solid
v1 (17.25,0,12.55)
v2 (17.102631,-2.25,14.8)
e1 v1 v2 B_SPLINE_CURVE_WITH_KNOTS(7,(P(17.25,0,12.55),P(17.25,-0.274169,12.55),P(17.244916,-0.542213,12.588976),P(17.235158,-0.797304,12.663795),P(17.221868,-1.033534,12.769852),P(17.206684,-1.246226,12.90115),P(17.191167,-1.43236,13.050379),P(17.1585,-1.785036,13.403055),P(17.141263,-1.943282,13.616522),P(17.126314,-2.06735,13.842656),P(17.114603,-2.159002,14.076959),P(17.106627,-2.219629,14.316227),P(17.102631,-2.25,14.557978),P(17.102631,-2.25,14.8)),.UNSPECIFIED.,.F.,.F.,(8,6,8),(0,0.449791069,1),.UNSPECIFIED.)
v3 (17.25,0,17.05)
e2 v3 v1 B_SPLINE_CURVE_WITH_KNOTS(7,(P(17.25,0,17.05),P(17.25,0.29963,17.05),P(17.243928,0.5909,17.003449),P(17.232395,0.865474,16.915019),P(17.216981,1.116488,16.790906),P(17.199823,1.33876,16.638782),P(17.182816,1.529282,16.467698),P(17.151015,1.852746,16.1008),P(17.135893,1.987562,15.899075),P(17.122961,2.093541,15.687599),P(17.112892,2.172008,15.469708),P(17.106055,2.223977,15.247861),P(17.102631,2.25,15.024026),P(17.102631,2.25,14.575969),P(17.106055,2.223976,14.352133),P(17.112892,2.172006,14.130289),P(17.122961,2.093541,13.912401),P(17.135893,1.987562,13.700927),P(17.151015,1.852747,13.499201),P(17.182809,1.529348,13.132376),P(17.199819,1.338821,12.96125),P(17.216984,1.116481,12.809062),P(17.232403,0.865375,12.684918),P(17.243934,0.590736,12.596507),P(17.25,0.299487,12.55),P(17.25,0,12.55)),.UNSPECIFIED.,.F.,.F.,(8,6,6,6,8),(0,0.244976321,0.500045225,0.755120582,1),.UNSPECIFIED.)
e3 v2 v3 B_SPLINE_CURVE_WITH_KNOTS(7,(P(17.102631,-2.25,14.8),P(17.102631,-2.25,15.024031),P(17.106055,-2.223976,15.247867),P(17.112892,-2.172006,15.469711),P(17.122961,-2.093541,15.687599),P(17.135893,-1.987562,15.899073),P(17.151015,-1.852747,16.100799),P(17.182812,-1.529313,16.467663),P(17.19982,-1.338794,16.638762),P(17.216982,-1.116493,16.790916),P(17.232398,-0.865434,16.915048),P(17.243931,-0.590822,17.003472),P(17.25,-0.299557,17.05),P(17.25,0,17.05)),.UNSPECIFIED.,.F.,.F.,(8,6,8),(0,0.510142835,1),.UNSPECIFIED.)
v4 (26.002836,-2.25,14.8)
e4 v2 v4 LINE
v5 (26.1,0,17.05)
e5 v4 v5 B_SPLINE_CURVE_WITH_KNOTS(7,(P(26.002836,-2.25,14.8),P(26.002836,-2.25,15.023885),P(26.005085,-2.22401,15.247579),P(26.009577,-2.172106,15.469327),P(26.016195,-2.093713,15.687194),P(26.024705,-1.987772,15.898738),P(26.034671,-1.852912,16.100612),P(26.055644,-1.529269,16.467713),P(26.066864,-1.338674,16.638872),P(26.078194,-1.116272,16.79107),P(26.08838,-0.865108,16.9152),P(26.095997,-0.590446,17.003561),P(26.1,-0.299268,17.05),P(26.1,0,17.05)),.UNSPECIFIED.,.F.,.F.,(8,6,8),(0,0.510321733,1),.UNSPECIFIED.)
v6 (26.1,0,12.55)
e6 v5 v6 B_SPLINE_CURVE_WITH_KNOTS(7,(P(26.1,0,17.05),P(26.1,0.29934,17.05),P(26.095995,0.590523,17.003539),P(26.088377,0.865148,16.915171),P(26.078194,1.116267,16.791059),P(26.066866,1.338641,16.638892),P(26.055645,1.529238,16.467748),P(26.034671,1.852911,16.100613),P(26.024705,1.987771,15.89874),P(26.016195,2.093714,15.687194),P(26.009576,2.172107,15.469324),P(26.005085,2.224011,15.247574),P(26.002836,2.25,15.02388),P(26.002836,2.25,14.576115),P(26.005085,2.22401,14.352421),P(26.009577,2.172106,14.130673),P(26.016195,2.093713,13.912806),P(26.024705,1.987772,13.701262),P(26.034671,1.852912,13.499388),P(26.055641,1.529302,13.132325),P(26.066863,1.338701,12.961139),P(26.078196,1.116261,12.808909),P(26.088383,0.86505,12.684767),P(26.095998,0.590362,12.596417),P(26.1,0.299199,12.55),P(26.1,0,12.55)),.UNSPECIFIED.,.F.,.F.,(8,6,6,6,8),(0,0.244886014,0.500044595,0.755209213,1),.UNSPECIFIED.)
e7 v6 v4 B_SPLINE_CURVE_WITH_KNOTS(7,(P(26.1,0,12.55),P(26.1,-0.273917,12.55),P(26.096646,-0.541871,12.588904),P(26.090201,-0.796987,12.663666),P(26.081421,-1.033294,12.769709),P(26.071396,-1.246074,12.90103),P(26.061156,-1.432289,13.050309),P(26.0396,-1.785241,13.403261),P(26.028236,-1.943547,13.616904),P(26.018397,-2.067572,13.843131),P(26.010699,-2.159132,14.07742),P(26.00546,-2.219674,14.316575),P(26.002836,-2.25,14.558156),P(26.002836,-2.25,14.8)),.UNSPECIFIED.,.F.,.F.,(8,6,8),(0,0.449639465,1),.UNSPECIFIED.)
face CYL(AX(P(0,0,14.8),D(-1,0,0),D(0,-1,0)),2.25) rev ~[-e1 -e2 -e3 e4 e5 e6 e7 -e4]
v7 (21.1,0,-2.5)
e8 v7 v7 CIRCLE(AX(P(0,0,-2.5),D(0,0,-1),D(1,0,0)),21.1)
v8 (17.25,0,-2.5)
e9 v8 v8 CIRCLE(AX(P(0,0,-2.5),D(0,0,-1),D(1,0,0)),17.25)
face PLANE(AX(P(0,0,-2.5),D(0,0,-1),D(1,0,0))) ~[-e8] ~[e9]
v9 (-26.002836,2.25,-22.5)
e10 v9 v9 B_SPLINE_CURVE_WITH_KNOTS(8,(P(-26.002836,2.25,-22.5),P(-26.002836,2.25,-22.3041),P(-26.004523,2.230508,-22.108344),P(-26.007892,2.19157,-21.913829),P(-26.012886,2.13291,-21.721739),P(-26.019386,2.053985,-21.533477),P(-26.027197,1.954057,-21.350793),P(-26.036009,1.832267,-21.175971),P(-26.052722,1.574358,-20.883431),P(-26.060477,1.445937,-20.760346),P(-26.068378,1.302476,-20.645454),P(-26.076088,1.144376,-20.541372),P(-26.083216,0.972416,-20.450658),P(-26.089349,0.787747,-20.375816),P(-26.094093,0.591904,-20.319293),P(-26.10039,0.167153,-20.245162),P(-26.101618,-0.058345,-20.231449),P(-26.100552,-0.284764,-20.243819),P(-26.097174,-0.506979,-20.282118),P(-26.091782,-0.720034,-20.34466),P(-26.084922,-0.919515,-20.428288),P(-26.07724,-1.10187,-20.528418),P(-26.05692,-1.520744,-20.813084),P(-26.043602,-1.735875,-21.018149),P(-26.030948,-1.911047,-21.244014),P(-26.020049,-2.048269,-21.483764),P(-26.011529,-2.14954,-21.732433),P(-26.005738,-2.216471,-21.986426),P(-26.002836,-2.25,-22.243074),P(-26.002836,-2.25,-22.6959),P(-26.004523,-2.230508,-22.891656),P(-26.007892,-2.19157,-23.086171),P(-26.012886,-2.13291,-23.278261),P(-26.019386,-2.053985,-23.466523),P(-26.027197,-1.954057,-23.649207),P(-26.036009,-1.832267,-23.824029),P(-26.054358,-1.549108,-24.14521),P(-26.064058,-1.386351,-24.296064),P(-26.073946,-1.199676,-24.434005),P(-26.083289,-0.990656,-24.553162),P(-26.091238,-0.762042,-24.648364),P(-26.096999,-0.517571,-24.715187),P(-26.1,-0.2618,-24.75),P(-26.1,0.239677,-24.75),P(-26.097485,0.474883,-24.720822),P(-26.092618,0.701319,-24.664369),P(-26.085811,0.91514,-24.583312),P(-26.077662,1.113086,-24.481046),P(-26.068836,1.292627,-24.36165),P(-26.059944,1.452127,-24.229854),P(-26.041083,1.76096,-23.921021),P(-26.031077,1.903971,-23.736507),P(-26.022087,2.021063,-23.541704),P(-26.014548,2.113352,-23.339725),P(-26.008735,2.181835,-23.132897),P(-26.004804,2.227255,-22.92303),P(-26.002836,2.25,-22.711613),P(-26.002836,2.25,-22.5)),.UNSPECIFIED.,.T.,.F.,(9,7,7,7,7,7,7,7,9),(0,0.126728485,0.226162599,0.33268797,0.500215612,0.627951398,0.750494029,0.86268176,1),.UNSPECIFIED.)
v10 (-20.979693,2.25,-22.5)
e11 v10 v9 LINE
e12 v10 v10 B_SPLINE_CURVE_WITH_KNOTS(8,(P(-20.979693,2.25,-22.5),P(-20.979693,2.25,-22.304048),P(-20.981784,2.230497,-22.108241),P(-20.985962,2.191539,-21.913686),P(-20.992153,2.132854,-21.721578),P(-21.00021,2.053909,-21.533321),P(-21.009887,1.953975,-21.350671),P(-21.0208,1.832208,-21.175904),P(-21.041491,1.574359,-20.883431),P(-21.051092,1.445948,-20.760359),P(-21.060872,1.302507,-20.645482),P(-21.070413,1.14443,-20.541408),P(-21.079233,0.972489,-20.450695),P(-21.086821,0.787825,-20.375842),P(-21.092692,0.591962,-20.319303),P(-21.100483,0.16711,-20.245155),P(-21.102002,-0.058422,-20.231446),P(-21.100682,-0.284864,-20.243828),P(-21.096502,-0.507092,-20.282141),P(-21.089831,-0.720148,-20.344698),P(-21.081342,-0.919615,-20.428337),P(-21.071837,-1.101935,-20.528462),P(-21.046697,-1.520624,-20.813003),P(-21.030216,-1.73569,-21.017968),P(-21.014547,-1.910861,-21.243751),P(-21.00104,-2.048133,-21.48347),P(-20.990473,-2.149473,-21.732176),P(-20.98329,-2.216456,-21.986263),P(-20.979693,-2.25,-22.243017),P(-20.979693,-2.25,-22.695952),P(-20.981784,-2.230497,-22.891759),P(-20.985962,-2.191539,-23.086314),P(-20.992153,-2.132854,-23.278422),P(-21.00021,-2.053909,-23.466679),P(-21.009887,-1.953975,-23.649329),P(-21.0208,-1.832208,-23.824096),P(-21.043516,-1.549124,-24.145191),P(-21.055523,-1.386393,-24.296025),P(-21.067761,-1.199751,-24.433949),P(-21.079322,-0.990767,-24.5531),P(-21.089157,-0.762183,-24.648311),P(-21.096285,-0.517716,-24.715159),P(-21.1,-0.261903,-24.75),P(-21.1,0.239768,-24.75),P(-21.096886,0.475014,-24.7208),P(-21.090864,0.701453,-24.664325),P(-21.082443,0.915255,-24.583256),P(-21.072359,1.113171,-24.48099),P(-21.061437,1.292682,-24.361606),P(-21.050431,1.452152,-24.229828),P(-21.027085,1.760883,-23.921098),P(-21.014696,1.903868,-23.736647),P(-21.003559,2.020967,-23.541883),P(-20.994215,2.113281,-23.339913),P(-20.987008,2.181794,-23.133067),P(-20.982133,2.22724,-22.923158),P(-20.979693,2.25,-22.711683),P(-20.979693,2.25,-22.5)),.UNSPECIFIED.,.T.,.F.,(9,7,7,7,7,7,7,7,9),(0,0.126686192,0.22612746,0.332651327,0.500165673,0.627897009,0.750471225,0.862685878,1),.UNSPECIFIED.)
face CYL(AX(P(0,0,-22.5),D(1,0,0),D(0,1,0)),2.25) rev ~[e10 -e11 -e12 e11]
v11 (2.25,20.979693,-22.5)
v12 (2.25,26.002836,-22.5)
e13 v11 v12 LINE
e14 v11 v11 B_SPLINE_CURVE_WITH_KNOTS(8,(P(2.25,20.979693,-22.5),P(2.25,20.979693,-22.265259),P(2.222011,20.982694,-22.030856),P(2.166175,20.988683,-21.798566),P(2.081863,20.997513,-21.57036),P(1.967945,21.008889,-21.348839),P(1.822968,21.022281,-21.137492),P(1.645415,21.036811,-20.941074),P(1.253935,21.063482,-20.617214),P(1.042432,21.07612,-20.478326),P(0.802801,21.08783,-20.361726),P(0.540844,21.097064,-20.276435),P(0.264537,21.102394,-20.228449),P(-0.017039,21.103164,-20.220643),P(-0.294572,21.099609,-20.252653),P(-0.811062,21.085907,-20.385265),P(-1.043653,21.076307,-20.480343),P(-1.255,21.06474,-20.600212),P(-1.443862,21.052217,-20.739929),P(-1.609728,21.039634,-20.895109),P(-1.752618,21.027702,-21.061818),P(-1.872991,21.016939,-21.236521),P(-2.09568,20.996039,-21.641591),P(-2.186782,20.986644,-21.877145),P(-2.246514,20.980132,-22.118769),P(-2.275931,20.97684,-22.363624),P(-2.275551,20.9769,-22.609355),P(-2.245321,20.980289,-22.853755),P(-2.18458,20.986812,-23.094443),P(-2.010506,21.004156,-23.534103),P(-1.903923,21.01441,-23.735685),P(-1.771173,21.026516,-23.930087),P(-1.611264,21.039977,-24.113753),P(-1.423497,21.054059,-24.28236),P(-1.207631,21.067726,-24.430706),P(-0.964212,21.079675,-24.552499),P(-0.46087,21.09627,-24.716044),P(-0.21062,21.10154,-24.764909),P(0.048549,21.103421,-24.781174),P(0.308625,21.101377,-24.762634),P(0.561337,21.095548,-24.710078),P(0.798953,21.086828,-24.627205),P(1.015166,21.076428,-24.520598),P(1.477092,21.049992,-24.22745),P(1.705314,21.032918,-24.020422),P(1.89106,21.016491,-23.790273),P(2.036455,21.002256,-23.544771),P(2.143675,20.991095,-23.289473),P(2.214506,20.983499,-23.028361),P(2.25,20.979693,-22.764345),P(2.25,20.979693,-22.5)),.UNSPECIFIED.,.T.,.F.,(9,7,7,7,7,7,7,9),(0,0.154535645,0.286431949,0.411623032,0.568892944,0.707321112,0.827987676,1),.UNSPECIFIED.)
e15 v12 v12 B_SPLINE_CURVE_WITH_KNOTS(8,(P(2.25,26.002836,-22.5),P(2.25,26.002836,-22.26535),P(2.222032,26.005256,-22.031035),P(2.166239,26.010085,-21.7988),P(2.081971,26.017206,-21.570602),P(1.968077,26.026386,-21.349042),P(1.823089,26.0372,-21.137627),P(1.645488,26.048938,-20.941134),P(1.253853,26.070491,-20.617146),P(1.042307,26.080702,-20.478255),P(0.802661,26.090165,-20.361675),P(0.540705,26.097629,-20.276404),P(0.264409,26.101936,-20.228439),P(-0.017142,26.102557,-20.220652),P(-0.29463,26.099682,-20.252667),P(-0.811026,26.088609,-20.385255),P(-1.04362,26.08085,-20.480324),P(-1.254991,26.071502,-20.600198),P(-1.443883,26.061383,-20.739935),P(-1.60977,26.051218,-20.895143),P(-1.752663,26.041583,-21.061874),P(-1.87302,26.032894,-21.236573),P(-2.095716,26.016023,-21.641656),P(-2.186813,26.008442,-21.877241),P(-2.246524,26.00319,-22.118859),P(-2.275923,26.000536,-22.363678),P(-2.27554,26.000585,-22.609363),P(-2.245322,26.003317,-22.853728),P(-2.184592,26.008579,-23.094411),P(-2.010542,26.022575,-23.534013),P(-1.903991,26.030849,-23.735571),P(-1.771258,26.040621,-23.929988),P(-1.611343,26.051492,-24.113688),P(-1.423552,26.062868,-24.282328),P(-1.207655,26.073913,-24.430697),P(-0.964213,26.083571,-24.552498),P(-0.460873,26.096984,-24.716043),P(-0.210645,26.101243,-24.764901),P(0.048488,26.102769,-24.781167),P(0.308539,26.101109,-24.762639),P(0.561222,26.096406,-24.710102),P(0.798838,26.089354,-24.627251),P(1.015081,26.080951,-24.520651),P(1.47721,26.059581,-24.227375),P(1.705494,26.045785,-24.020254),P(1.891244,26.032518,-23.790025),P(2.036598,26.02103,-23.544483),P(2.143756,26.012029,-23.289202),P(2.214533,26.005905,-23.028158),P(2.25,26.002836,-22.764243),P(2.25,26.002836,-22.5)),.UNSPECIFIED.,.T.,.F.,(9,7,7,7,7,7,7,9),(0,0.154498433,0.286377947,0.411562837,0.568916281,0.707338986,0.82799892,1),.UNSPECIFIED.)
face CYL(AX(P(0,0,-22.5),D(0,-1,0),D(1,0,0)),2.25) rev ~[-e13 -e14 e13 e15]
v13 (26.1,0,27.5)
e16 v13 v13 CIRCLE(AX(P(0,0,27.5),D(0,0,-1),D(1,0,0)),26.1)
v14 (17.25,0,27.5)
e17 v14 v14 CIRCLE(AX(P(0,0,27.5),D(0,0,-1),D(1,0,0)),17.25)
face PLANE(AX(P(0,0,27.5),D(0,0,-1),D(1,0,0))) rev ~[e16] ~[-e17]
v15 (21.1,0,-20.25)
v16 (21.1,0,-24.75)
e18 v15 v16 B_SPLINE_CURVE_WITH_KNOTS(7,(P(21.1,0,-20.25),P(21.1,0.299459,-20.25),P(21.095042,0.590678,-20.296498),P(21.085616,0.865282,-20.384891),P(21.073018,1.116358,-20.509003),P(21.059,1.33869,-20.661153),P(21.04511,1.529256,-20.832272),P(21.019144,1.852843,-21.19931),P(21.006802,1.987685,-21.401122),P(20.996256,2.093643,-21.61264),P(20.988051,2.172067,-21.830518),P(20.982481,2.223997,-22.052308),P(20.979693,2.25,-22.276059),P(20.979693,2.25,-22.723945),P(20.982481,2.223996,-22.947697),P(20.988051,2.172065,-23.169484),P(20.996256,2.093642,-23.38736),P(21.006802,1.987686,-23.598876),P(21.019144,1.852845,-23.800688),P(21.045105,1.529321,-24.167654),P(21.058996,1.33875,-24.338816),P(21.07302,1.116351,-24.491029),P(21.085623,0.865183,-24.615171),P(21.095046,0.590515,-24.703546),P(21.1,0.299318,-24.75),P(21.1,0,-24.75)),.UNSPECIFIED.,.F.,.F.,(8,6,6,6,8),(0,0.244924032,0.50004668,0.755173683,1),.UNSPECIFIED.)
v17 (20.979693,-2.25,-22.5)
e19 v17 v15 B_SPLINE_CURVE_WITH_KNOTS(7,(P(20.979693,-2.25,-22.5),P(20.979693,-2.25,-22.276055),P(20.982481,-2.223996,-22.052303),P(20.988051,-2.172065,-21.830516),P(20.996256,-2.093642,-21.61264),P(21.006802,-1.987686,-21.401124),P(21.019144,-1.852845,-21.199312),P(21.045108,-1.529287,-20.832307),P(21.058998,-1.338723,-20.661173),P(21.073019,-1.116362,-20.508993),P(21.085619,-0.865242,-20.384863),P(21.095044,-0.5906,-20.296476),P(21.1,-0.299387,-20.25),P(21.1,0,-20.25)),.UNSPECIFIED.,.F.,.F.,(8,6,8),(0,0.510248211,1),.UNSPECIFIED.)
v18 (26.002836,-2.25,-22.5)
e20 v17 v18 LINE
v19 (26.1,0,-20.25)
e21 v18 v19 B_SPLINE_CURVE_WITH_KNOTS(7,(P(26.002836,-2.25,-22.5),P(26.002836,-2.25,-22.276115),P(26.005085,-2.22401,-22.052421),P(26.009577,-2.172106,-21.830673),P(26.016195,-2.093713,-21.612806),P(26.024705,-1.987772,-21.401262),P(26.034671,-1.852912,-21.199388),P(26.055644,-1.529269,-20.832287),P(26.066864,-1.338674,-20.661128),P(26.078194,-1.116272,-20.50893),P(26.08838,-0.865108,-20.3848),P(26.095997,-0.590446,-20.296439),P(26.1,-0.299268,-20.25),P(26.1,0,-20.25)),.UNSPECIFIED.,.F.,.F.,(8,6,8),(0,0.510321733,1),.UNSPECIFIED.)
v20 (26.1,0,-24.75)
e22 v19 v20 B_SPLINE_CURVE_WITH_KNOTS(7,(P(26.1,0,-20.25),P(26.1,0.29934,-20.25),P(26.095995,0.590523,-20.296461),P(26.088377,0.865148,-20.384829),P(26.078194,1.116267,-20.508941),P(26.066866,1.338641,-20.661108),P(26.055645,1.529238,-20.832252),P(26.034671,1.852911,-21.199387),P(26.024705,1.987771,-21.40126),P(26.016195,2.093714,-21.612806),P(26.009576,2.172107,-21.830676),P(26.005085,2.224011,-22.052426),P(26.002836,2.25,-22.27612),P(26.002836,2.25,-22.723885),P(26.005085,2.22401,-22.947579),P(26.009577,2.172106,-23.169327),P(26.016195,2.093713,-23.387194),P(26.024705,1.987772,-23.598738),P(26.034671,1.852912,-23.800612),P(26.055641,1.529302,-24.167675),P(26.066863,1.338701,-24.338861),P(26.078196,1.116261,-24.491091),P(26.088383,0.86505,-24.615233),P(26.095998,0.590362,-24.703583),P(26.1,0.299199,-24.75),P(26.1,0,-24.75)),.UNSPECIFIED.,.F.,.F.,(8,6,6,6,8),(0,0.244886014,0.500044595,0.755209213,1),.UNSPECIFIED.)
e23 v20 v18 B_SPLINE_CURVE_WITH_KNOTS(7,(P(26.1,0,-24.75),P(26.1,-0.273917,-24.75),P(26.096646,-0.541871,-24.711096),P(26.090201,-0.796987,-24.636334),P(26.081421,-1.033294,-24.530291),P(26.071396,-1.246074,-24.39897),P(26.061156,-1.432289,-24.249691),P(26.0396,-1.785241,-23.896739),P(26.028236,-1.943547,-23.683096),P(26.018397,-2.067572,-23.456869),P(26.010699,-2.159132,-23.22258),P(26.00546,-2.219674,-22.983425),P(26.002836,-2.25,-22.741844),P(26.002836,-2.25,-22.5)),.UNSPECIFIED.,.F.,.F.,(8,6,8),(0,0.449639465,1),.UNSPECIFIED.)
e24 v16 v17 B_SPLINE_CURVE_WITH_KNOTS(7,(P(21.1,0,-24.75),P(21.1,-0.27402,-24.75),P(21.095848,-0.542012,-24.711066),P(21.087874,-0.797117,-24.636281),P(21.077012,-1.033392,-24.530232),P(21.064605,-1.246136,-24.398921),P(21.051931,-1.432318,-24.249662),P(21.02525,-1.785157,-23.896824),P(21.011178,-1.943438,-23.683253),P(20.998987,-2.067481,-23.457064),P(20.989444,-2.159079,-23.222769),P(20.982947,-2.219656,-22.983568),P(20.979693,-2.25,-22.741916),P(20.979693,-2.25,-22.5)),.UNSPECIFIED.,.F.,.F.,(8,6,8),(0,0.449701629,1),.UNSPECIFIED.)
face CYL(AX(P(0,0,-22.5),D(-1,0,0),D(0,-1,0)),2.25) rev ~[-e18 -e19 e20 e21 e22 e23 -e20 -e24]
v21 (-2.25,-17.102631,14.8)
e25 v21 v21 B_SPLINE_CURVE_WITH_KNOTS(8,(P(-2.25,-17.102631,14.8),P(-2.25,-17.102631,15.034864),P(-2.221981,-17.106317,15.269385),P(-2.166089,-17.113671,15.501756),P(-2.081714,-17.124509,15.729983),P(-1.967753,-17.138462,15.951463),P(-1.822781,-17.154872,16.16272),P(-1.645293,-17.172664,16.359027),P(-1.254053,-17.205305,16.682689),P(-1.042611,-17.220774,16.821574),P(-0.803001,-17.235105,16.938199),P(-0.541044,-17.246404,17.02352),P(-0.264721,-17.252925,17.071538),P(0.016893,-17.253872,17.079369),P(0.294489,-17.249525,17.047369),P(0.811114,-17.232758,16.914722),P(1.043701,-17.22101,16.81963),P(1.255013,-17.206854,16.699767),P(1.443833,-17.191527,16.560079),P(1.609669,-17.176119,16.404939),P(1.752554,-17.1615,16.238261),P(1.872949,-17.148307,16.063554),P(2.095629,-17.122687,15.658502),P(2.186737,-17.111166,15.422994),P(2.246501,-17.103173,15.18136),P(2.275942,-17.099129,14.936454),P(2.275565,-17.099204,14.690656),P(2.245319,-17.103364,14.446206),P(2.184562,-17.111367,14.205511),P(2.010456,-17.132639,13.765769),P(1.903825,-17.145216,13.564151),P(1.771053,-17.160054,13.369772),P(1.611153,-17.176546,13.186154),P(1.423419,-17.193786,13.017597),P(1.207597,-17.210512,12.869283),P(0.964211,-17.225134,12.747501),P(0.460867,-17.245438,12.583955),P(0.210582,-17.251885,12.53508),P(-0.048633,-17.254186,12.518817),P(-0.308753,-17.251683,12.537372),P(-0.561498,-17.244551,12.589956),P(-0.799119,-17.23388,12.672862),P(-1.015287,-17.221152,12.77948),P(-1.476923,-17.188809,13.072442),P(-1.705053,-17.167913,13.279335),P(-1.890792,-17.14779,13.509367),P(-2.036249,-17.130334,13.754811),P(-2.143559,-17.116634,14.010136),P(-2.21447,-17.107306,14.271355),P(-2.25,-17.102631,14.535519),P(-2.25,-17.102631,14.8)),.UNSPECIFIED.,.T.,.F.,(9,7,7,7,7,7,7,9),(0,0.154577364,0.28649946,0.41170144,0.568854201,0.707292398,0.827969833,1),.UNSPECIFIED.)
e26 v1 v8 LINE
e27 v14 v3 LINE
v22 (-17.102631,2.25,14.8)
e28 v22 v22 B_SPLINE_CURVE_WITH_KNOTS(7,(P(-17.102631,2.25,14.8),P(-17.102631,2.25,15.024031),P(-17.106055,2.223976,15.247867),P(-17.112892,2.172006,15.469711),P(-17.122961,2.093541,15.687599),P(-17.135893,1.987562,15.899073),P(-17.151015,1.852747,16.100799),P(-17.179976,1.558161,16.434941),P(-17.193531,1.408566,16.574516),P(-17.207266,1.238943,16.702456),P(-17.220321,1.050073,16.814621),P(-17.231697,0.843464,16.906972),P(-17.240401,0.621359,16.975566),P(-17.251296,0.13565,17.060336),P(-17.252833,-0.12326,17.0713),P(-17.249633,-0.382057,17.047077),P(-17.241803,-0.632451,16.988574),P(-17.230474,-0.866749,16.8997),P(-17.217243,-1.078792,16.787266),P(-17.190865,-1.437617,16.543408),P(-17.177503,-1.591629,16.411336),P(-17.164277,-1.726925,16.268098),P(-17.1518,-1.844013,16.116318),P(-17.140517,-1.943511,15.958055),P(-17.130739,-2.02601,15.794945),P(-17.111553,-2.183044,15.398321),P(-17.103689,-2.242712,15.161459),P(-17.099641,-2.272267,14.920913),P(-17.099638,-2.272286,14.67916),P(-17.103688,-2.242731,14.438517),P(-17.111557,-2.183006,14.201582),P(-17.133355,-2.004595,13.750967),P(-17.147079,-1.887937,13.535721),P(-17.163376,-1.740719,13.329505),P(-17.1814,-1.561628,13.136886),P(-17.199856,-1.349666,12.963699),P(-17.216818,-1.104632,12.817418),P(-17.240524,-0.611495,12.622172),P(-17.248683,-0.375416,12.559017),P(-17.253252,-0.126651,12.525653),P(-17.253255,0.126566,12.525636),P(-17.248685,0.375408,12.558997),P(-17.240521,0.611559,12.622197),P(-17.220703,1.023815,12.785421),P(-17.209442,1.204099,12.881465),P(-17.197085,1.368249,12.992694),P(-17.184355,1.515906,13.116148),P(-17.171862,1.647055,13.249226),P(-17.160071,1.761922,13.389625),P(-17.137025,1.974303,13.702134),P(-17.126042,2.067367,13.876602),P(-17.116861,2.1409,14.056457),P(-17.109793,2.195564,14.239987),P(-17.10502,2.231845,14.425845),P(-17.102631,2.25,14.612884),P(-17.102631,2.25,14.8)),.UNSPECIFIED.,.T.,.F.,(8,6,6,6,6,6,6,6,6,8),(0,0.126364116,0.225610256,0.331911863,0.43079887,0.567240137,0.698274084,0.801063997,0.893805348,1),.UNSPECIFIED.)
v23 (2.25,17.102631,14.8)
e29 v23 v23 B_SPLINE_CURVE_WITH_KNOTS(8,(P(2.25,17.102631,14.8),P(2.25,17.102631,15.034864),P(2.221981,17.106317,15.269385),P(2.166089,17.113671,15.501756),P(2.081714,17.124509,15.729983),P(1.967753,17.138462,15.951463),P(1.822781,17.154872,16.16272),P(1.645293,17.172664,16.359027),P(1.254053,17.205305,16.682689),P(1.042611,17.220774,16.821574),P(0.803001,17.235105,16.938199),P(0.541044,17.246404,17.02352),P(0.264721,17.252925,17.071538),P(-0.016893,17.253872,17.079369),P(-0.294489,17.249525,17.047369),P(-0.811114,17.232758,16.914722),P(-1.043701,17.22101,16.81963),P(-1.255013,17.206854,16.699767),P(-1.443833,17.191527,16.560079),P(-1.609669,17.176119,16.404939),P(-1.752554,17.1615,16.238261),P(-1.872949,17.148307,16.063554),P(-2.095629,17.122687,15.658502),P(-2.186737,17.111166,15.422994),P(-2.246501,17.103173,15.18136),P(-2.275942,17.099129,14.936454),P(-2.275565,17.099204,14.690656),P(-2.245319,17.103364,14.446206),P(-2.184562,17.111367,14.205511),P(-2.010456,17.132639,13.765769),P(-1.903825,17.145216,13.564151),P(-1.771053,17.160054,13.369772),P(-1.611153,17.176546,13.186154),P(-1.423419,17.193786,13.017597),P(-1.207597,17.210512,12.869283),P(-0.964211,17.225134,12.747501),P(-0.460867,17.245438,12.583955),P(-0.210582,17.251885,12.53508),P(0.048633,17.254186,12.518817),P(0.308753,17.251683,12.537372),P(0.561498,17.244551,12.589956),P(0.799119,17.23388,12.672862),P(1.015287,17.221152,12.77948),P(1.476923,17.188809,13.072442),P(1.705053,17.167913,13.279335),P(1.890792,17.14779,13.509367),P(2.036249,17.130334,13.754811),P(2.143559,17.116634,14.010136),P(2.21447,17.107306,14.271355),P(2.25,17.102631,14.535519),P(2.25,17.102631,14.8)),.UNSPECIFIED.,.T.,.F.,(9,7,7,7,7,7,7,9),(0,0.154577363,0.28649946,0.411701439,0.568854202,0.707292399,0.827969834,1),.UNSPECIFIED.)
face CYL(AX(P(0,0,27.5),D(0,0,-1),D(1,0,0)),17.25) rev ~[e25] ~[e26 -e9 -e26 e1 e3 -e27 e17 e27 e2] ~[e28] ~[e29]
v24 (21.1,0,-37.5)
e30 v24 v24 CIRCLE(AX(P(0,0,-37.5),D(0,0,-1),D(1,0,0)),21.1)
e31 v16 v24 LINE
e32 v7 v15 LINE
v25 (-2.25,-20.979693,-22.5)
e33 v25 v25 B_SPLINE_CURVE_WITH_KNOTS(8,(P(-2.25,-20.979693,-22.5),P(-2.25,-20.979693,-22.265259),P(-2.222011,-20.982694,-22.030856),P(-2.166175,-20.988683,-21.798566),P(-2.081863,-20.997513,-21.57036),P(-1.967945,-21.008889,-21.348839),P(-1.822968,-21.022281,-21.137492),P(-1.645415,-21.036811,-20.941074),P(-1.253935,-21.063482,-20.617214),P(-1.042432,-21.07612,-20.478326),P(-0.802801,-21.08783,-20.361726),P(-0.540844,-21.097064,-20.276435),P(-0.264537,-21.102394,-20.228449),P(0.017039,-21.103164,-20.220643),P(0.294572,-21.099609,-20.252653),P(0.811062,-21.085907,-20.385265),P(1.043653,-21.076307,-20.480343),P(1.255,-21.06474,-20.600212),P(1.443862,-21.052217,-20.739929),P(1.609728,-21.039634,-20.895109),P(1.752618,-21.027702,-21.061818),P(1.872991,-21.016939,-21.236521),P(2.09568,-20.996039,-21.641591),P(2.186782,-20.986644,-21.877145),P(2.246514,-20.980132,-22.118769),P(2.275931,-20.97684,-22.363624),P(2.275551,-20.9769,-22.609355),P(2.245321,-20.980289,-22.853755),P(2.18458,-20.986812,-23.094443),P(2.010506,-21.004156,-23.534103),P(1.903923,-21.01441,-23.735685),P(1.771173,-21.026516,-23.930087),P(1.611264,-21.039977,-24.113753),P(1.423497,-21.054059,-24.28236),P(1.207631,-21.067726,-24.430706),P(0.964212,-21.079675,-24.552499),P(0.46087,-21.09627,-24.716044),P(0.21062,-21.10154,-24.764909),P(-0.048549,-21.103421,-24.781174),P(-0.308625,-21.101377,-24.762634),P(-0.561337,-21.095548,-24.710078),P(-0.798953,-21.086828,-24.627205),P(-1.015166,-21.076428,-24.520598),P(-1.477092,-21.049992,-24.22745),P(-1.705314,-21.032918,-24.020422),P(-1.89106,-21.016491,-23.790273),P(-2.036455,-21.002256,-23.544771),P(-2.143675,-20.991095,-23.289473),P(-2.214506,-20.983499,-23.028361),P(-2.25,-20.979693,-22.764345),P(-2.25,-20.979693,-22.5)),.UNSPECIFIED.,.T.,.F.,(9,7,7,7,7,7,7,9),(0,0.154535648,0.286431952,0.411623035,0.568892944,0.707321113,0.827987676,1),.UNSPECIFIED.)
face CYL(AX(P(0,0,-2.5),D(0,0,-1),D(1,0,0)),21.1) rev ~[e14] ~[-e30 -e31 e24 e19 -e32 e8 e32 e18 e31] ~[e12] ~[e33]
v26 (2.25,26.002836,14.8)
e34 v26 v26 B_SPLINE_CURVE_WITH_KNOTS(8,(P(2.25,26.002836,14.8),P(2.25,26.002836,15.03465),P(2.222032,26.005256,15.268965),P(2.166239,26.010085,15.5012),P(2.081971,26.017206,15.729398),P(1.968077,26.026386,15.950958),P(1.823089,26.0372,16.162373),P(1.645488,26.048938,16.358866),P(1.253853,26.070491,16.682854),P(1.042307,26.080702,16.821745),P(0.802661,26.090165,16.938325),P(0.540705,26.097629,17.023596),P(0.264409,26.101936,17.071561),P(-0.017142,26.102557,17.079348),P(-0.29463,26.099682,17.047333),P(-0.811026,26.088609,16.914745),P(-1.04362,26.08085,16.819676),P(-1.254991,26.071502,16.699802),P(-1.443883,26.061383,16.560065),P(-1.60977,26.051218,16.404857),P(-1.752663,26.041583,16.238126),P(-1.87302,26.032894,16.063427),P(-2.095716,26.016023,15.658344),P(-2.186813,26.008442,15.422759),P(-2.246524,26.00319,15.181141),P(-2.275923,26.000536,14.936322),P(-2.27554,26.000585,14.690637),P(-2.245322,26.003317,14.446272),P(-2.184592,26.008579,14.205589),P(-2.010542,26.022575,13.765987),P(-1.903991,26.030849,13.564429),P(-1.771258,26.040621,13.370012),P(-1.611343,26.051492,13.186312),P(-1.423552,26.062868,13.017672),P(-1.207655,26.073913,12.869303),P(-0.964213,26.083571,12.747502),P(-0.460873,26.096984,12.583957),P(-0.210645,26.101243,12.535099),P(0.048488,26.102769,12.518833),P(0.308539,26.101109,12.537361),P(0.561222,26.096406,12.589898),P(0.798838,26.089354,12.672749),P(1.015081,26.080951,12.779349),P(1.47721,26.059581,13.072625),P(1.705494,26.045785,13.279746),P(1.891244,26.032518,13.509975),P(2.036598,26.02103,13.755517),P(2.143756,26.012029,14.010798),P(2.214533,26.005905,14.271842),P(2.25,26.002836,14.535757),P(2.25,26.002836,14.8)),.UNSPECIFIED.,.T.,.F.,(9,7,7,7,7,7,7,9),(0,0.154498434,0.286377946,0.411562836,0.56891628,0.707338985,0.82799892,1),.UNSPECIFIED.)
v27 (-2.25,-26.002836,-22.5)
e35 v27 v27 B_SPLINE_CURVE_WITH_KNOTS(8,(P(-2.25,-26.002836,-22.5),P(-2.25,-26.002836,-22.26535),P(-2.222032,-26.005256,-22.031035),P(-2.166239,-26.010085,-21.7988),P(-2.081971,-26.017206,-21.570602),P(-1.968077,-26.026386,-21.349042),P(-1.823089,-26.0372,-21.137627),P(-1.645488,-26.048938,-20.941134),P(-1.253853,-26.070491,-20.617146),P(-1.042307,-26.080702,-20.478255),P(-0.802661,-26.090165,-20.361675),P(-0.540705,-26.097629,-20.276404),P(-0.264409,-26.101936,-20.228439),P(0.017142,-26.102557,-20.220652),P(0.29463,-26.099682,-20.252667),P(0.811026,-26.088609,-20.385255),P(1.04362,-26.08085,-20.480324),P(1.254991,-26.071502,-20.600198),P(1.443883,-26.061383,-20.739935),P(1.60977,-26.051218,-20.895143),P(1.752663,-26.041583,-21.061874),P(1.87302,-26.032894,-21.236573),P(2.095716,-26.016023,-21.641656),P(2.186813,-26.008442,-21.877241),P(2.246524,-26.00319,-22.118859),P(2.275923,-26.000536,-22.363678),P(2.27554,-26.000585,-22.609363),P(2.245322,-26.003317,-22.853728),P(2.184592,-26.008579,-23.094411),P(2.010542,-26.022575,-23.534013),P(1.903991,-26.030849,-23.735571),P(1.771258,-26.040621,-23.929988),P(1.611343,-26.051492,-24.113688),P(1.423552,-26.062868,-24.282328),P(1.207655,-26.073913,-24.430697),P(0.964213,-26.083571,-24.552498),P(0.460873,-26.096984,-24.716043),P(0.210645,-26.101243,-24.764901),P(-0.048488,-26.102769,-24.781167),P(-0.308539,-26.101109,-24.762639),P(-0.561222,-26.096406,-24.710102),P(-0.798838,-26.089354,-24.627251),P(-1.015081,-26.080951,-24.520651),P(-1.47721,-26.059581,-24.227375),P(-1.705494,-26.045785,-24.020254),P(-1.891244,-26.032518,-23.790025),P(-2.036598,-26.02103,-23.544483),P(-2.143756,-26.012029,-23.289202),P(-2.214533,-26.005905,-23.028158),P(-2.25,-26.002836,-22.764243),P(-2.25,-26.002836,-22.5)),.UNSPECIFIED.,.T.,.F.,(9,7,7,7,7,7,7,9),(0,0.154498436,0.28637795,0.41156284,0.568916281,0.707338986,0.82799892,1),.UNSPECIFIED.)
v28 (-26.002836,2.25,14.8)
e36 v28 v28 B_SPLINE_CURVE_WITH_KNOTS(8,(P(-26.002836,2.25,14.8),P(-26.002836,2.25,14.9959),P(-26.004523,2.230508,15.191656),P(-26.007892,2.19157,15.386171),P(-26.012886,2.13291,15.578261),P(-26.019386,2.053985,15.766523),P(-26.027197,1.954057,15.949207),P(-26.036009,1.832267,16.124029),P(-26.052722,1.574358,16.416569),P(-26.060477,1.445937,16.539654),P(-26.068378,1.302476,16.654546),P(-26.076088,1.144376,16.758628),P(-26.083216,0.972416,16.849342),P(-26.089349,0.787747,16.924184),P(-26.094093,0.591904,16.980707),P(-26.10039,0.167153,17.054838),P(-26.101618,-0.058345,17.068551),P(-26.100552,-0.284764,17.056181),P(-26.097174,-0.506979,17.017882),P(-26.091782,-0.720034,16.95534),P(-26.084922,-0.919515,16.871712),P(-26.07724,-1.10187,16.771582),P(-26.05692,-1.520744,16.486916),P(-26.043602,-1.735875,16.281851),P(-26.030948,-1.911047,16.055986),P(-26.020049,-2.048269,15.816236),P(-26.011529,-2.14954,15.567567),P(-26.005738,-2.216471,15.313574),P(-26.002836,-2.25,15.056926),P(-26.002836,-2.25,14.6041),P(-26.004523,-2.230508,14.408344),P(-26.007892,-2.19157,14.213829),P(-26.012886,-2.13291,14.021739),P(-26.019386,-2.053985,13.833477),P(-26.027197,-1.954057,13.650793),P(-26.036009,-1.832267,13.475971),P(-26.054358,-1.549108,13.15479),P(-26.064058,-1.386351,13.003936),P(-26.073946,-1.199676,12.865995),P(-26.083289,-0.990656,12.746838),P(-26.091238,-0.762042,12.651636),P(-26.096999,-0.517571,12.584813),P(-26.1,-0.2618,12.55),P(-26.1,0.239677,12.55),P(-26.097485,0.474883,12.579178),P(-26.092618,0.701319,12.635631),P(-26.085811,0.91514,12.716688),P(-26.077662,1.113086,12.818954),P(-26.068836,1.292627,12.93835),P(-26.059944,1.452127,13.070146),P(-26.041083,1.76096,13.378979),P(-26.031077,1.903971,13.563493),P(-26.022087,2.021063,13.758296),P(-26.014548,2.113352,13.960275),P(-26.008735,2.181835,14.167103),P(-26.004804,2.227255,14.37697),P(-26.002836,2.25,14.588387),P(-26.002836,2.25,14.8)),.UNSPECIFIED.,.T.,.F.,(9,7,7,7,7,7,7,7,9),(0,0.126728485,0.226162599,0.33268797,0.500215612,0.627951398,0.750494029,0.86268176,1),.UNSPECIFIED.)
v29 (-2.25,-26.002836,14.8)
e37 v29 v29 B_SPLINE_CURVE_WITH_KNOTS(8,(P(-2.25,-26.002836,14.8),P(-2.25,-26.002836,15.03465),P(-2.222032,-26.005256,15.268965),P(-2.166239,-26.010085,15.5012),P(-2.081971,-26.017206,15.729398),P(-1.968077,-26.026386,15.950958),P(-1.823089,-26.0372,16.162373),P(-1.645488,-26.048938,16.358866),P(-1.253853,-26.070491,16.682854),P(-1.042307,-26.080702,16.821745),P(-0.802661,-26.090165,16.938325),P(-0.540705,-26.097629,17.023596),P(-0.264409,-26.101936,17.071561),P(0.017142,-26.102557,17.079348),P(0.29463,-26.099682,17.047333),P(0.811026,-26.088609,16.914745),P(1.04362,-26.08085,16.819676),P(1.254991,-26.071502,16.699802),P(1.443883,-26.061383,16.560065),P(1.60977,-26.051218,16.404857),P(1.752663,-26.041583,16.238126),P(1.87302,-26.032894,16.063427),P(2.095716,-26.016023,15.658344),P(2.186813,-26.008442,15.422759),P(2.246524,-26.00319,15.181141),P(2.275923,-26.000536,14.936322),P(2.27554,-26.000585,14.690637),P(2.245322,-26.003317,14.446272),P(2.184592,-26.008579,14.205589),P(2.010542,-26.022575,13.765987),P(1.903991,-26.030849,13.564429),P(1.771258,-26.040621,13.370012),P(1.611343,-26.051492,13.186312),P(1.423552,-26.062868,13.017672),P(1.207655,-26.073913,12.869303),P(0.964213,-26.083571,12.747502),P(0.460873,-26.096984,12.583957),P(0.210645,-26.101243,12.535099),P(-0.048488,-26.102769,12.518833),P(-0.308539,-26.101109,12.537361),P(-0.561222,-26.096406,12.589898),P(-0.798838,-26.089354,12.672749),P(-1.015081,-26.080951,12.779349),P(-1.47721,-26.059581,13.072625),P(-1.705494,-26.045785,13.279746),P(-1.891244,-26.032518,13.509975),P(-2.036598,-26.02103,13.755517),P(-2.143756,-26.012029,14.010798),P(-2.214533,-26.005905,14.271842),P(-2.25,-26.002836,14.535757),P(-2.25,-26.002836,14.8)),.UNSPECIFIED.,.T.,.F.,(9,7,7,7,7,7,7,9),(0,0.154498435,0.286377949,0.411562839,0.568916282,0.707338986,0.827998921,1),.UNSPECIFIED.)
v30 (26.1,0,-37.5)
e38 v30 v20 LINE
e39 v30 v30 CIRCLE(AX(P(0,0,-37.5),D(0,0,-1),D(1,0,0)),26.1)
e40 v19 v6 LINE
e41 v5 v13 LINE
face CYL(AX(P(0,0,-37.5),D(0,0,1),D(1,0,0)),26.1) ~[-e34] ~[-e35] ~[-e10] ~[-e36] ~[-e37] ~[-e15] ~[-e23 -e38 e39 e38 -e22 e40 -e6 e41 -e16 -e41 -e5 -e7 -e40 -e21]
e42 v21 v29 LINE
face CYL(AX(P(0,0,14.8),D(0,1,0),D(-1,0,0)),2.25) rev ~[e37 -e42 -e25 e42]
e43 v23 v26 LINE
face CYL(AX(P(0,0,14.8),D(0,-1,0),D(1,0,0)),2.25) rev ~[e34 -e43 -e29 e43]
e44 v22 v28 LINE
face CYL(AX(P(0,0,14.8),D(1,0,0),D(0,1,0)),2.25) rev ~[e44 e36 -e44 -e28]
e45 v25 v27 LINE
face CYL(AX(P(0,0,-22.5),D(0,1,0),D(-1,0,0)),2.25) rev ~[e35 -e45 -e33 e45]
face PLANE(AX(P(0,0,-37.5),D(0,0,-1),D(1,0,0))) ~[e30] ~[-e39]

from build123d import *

# Parameters (mm, degrees)
F2_R            = 2.25
F3_DEPTH        = 28
F3_COPIES_COUNT = 4


# Not quite as in the source:
# - a pattern or mirror of a feature is missing from the dataset's text; its kind, count and spacing are read off the source's solid


with BuildPart() as f1:
    # F0 (on Front) → F1 (revolve)
    with BuildSketch(Plane.XZ):
        Polygon((26.1, 27.5), (17.25, 27.5), (17.25, 2.5), (17.25, -2.5), (21.1, -2.5), (21.1, -37.5), (26.1, -37.5), align=None)
    revolve(axis=Axis((0, 0, 0), (0, 0, -1)))

    # F2 (on Front) → F3 (cut)
    with BuildSketch(Plane.XZ):
        with Locations((0, 14.8)):
            Circle(F2_R)
        with Locations((0, -22.5)):
            Circle(F2_R)
    f3 = extrude(amount=-F3_DEPTH, mode=Mode.SUBTRACT)

    # F3_copies: F3 ×4 about axis
    f3_copies_axis = Axis((0, 0, 0), (0, 0, 1))
    for i in range(1, F3_COPIES_COUNT):
        add(f3.rotate(f3_copies_axis, i * 360 / F3_COPIES_COUNT), mode=Mode.SUBTRACT)


solid = f1.part
